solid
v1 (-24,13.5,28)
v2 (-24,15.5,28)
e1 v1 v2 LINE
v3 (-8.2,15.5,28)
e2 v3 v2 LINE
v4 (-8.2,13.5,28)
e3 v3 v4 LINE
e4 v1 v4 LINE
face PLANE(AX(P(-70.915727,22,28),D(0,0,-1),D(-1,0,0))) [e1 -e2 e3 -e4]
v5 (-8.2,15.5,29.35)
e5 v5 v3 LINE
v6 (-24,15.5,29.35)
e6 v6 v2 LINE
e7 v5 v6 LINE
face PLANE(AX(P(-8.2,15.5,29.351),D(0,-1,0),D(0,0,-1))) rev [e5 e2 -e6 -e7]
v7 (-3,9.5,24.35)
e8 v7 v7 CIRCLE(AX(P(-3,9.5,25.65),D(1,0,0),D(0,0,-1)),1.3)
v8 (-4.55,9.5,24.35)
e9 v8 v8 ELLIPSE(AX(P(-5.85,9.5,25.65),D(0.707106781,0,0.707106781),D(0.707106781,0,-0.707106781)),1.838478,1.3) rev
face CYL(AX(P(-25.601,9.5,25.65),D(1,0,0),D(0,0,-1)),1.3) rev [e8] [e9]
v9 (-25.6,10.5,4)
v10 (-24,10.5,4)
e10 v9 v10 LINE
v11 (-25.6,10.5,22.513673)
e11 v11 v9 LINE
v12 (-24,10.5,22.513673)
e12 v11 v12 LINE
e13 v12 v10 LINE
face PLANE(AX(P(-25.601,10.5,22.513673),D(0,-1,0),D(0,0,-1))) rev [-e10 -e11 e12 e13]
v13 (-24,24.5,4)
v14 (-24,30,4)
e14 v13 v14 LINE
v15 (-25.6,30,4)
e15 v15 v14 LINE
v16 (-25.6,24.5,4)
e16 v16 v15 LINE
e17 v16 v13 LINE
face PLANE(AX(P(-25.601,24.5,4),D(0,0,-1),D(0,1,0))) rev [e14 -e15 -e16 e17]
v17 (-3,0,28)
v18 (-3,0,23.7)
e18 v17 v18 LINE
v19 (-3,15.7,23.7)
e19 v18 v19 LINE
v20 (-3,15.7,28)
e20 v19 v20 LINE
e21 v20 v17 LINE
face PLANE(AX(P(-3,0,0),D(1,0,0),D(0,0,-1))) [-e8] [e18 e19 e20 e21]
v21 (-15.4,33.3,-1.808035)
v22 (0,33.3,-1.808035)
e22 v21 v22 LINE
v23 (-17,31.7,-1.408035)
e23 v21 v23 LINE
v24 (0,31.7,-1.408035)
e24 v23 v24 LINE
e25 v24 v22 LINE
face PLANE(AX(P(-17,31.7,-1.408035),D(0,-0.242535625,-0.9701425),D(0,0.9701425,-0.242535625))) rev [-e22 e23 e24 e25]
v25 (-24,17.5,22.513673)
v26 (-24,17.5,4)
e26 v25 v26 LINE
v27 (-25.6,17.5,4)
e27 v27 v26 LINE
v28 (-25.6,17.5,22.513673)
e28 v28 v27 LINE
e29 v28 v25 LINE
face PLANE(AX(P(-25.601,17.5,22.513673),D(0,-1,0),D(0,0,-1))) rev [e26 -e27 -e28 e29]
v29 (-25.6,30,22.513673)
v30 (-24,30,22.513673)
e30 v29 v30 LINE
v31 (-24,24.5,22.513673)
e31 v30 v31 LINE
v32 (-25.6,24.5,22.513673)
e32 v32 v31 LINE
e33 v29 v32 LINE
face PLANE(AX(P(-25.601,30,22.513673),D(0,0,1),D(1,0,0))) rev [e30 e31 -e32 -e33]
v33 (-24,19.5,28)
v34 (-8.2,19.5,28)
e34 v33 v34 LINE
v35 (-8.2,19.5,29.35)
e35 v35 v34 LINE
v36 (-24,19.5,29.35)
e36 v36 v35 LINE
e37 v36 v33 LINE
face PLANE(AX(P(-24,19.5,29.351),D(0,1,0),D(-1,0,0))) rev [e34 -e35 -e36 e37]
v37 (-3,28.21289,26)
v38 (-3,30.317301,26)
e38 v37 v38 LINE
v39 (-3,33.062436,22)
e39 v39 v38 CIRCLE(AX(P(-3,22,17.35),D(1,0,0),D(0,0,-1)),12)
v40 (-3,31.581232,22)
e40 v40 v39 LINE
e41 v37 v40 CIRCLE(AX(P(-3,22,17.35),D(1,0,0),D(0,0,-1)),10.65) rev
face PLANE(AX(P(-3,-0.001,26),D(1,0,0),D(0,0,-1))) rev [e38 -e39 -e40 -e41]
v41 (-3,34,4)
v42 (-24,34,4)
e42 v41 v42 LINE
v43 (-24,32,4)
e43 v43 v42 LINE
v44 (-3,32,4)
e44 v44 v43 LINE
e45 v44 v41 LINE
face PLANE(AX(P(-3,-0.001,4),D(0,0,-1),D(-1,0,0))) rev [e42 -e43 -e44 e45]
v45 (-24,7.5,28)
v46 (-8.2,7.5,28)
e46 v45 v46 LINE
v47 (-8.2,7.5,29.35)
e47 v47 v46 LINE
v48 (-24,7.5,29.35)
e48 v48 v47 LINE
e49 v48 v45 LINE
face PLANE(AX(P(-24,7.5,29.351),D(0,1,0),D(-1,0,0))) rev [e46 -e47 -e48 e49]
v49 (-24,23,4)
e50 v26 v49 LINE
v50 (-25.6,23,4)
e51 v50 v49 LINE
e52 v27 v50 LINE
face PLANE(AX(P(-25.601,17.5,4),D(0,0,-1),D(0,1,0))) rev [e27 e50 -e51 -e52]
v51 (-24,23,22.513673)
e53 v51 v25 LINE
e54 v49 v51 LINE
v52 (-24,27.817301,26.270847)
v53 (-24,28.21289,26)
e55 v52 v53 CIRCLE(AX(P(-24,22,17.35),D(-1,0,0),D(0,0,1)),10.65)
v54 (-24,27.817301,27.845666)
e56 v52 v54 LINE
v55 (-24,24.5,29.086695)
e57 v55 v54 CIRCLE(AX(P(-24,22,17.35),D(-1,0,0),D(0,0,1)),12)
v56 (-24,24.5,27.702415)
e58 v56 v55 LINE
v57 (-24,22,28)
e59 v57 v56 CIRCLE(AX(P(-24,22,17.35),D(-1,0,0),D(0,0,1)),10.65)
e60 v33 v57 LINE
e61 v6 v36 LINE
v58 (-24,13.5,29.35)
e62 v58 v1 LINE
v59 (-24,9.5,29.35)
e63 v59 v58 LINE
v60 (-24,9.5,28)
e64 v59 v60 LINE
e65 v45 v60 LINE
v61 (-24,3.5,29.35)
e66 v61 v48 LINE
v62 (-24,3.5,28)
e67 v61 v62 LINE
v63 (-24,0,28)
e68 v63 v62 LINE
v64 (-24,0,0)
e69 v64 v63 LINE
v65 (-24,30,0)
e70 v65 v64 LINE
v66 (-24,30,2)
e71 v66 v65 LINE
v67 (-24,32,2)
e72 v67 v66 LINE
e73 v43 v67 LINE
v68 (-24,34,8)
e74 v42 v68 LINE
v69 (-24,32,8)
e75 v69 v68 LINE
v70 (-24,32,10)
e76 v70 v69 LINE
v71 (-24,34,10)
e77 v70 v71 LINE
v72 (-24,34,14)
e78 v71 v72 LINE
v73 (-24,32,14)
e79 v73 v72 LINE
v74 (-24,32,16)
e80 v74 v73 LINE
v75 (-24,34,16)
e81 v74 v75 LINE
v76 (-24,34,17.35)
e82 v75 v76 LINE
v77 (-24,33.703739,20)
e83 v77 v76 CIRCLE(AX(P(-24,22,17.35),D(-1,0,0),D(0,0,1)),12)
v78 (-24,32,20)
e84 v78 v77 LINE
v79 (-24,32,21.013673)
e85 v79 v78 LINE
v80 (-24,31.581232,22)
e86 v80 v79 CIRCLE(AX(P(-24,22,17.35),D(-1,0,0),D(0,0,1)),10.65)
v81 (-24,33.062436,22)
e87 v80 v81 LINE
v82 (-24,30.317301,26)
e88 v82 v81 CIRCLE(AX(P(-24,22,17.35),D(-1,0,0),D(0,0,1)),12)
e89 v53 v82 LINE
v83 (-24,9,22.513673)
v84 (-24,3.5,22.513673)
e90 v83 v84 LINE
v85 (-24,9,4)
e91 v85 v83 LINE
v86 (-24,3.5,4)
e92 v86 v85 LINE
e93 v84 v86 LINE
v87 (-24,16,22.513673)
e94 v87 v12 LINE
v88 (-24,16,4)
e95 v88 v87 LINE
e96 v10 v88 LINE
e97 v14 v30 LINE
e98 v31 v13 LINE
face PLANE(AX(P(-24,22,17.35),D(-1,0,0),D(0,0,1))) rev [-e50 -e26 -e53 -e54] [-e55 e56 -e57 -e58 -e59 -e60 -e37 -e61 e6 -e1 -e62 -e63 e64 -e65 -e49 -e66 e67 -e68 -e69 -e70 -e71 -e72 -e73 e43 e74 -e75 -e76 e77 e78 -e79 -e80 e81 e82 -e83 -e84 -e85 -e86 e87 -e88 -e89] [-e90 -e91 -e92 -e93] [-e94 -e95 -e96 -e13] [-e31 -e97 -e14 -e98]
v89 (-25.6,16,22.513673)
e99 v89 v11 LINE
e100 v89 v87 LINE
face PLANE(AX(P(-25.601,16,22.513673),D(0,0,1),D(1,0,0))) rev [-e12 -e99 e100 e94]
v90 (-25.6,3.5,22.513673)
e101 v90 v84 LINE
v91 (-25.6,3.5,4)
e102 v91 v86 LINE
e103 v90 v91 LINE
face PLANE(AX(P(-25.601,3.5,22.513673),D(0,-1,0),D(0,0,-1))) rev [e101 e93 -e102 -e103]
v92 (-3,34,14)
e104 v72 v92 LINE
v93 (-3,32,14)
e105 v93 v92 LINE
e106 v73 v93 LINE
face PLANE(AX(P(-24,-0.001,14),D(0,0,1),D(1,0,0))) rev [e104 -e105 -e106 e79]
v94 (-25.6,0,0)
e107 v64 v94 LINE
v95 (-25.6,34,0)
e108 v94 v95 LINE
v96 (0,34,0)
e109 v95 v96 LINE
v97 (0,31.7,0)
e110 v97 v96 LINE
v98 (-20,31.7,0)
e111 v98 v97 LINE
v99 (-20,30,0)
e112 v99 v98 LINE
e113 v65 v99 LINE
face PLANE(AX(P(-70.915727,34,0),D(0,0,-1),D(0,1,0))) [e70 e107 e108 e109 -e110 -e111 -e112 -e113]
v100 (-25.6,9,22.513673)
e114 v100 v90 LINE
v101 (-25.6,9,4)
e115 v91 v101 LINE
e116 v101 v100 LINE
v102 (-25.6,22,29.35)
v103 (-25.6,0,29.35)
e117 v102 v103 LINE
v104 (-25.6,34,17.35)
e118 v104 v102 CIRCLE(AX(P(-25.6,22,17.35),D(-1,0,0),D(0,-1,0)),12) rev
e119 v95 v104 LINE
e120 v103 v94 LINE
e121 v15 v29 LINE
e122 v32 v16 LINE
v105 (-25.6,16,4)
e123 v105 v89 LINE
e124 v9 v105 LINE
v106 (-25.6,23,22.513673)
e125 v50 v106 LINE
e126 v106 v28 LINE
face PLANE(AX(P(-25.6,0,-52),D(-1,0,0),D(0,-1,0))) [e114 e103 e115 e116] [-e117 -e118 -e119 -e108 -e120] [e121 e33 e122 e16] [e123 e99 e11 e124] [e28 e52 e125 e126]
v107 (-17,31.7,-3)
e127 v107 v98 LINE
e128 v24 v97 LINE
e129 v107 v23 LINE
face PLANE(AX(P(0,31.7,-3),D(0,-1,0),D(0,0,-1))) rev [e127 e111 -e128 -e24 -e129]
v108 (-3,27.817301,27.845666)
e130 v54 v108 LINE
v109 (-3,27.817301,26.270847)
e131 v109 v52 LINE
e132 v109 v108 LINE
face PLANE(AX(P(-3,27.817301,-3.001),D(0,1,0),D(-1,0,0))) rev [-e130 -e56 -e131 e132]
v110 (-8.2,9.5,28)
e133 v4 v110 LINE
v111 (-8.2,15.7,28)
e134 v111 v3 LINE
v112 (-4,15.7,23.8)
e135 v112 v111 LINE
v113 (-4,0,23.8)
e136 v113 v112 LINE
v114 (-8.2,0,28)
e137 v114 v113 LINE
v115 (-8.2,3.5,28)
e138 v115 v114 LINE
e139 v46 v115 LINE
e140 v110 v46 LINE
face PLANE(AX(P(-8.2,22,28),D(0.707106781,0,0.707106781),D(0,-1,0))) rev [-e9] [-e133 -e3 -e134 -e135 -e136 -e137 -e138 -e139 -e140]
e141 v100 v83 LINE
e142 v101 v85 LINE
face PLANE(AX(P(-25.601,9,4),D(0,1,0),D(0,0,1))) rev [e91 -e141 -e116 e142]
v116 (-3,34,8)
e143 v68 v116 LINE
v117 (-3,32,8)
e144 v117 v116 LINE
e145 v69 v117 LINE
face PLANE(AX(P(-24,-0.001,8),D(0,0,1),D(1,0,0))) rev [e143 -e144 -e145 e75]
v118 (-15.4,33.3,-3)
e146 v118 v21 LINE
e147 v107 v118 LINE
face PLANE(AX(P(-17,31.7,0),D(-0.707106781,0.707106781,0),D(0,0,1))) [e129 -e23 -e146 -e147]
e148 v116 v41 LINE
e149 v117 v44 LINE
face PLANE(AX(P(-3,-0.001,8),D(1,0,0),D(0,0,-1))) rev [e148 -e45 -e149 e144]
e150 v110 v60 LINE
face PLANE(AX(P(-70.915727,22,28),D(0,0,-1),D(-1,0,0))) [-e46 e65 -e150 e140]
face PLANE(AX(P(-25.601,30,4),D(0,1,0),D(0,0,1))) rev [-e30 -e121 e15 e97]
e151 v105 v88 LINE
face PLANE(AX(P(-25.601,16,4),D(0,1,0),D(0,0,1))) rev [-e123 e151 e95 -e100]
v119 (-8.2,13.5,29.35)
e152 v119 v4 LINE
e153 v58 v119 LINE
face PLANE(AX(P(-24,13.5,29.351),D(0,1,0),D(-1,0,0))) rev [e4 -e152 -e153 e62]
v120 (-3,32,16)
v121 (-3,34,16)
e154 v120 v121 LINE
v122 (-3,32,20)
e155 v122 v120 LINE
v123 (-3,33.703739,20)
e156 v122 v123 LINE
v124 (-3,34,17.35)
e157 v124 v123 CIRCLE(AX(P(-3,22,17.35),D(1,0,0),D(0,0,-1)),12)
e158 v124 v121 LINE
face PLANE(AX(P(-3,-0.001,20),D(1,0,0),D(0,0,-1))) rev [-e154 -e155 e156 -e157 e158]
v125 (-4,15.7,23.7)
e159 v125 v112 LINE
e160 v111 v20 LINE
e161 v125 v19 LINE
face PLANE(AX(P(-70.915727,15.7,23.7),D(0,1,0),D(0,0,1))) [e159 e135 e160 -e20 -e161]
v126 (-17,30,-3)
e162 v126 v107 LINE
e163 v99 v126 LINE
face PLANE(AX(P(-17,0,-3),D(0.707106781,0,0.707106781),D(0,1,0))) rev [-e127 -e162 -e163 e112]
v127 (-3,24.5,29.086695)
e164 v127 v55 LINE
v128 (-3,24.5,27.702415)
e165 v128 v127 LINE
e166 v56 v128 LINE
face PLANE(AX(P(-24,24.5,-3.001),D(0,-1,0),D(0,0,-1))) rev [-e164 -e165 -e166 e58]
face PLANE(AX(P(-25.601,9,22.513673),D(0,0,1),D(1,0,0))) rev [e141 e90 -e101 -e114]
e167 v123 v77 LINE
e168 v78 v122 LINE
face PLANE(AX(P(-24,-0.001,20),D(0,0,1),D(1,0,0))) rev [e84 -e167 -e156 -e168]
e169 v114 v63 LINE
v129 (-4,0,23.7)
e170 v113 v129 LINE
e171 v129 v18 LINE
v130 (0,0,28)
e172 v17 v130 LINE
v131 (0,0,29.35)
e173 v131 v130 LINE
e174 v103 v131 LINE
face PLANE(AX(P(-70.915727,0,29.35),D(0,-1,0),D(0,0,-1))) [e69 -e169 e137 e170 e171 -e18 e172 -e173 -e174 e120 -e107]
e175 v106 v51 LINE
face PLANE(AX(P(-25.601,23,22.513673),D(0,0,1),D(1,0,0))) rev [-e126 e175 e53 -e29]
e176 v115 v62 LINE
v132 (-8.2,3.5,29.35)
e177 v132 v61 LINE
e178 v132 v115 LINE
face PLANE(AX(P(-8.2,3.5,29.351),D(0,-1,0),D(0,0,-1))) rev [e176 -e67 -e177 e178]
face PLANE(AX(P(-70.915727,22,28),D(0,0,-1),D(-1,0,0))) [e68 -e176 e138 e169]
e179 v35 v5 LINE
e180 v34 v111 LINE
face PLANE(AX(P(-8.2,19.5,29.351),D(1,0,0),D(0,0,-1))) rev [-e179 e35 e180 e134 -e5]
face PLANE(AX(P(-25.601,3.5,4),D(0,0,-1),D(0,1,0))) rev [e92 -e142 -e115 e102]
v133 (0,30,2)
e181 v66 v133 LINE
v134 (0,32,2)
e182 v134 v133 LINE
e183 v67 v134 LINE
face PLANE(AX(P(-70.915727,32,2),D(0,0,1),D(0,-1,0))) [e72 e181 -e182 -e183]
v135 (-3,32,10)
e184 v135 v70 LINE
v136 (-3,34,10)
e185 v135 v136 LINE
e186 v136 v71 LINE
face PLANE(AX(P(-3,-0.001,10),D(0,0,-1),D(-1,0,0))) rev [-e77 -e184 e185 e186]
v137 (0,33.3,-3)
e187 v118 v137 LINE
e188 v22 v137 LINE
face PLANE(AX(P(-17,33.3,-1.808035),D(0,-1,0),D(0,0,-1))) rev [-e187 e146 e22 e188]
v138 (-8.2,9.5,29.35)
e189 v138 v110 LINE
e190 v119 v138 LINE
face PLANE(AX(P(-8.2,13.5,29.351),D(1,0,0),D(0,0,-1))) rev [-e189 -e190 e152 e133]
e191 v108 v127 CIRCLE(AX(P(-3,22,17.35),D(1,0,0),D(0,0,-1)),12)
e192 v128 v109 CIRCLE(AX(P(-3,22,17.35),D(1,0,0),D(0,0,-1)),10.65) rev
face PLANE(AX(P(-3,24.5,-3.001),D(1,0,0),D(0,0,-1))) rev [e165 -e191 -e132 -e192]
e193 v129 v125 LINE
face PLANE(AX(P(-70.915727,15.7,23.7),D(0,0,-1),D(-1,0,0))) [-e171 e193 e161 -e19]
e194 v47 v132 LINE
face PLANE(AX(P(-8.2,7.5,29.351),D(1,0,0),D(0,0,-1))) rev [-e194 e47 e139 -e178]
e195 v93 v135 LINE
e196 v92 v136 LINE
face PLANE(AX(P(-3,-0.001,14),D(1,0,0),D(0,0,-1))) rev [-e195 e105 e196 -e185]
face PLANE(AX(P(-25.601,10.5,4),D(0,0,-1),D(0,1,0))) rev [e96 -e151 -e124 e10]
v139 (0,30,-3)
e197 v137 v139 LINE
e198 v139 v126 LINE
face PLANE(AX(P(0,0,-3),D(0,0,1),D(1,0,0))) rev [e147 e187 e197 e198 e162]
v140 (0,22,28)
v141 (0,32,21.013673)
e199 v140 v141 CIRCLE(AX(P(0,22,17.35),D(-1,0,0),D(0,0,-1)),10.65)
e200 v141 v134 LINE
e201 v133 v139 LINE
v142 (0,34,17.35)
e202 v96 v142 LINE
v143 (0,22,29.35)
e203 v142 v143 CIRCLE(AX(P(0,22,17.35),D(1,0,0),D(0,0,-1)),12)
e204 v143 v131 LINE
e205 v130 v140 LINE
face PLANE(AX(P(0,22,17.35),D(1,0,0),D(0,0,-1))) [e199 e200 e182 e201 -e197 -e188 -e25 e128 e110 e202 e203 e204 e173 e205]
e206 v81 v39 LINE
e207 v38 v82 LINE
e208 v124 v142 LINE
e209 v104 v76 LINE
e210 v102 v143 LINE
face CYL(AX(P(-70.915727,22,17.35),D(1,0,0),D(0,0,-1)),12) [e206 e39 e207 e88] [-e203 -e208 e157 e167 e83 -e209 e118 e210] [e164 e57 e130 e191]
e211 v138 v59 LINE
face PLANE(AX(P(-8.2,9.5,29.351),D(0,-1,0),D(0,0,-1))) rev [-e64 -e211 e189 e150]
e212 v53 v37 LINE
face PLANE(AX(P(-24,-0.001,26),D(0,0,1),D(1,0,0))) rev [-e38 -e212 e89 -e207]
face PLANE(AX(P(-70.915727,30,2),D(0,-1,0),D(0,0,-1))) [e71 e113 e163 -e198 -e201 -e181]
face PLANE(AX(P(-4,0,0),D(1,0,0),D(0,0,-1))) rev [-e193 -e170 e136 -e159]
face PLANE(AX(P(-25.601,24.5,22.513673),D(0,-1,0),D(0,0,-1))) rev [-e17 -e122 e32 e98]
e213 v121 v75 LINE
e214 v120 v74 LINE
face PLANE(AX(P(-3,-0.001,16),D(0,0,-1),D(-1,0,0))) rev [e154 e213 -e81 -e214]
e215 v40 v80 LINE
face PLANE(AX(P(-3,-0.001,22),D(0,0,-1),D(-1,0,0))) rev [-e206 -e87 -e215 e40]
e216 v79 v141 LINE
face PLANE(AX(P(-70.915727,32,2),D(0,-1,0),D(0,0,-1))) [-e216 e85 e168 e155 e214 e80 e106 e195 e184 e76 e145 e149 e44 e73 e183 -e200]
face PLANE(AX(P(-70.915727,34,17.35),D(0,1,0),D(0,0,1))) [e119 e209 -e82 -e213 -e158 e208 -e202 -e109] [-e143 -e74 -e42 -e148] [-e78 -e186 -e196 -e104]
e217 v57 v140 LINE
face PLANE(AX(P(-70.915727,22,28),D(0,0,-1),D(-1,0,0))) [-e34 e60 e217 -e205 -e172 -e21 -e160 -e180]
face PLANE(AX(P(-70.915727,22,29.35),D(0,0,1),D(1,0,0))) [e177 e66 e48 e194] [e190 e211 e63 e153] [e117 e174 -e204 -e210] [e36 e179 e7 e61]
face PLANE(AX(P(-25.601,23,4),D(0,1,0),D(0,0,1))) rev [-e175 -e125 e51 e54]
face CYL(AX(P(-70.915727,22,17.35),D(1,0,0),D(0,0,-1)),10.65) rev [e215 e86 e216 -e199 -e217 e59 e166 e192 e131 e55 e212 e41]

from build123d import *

# Parameters (mm, degrees)
BOSS_EXTRUDE1_DEPTH     = 25.6
SKETCH2_W               = 4.3
SKETCH2_H               = 15.7
CUT_EXTRUDE1_DEPTH      = 3
CUT_EXTRUDE2_REACH      = 52.281
SKETCH3_R               = 1.3
BOSS_EXTRUDE2_START     = -1.6
BOSS_EXTRUDE2_DEPTH     = 1.6
SKETCH6_W               = 20
SKETCH6_H               = 1.7
BOSS_EXTRUDE3_DEPTH     = 3
CHAMFER2_SIZE           = 3
BOSS_EXTRUDE5_DEPTH     = 17
CHAMFER3_SIZE           = 1.6
CUT_EXTRUDE3_REACH      = 52.926
SKETCH9_W               = 18.51367302
SKETCH9_H               = 5.5
LPATTERN1_COUNT         = 4
LPATTERN1_PITCH         = 7
CUT_EXTRUDE4_REACH      = 53.699
SKETCH10_W              = 21
SKETCH10_H              = 4
LPATTERN2_COUNT         = 4
LPATTERN2_PITCH         = 6
SKETCH11_W              = 4.3
SKETCH11_H              = 15.7
CUT_EXTRUDE5_DEPTH      = 20
CHAMFER4_SIZE           = 4.2
CUT_EXTRUDE6_REACH      = 54.653
SKETCH12_W              = 15.8
SKETCH12_H              = 4
LPATTERN3_COUNT         = 3
LPATTERN3_PITCH         = 6
CUT_EXTRUDE7_REACH      = 55.459
CUT_EXTRUDE7_END_RADIUS = 10.65
SKETCH13_W              = 21
SKETCH13_H              = 3.317301245


# Some blends are built 0.0001 mm under size
with BuildPart() as part:
    # Sketch1 → Boss-Extrude1 (new body)
    with BuildSketch(Plane(origin=(0, 0, 0), x_dir=(0, 0, -1), z_dir=(1, 0, 0))):
        with BuildLine():
            Line((-2, 32), (-2, 30))
            Line((-2, 30), (0, 30))
            Line((0, 30), (0, 34))
            Line((0, 34), (-17.35, 34))
            ThreePointArc((-17.35, 34), (-25.835281374, 30.485281374), (-29.35, 22))
            Line((-29.35, 22), (-29.35, 0))
            Line((-29.35, 0), (-23.7, 0))
            Line((-23.7, 0), (-23.7, 15.7))
            Line((-23.7, 15.7), (-28, 15.7))
            Line((-28, 15.7), (-28, 22))
            ThreePointArc((-28, 22), (-26.080424321, 28.099359898), (-21.01367302, 32))
            Line((-21.01367302, 32), (-2, 32))
        make_face()
    extrude(amount=-BOSS_EXTRUDE1_DEPTH)

    # Sketch2 → Cut-Extrude1 (cut)
    with BuildSketch(Plane(origin=(0, 0, 0), x_dir=(0, 0, -1), z_dir=(1, 0, 0))):
        with Locations((-25.85, 7.85)):
            Rectangle(SKETCH2_W, SKETCH2_H)
    extrude(amount=-CUT_EXTRUDE1_DEPTH, mode=Mode.SUBTRACT)

    # Sketch3 → Cut-Extrude2 (cut, up to next)
    with BuildSketch(Plane(origin=(-3, 0, 0), x_dir=(0, 0, -1), z_dir=(1, 0, 0)), mode=Mode.PRIVATE) as cut_extrude2_sk1:
        with Locations((-25.65, 9.5)):
            Circle(SKETCH3_R)
    cut_extrude2_tool1 = extrude(cut_extrude2_sk1.sketch, amount=-CUT_EXTRUDE2_REACH, mode=Mode.PRIVATE) & part.part
    add(cut_extrude2_tool1.solids().sort_by_distance((-3, 9.5, 25.65))[0], mode=Mode.SUBTRACT)

    # Sketch4 → Boss-Extrude2 (add)
    with BuildSketch(Plane.ZY.offset(25.6).offset(BOSS_EXTRUDE2_START)):
        with BuildLine():
            Line((0, 34), (0, 0))
            Line((0, 0), (29.35, 0))
            Line((29.35, 0), (29.35, 22))
            ThreePointArc((29.35, 22), (25.835281374, 30.485281374), (17.35, 34))
            Line((17.35, 34), (0, 34))
        make_face()
    extrude(amount=BOSS_EXTRUDE2_DEPTH)

    # Sketch6 → Boss-Extrude3 (add)
    with BuildSketch(Plane(origin=(0, 0, 0), x_dir=(-1, 0, 0), z_dir=(0, 0, -1))):
        with Locations((10, 30.85)):
            Rectangle(SKETCH6_W, SKETCH6_H)
    extrude(amount=BOSS_EXTRUDE3_DEPTH)

    # Chamfer2
    chamfer2_edges = [part.edges().sort_by_distance(p)[0] for p in [
        (-20, 30.85, -3),
    ]]
    chamfer(chamfer2_edges, length=CHAMFER2_SIZE - 0.0001)  # a hair under: the kernel refuses the full size

    # Sketch8 → Boss-Extrude5 (add)
    with BuildSketch(Plane.ZY):
        Polygon((-1.408034607, 31.7), (-1.808034607, 33.3), (-3, 33.3), (-3, 31.7), align=None)
    extrude(amount=BOSS_EXTRUDE5_DEPTH)

    # Chamfer3
    chamfer3_edges = [part.edges().sort_by_distance(p)[0] for p in [
        (-17, 33.3, -2.404017304),
    ]]
    chamfer(chamfer3_edges, length=CHAMFER3_SIZE - 0.0001)  # a hair under: the kernel refuses the full size

    # Sketch9 → Cut-Extrude3 (cut, up to next)
    with BuildSketch(Plane(origin=(-24, 0, 0), x_dir=(0, 0, -1), z_dir=(1, 0, 0)), mode=Mode.PRIVATE) as cut_extrude3_sk1:
        with Locations((-13.25683651, 27.25)):
            Rectangle(SKETCH9_W, SKETCH9_H)
    cut_extrude3_tool1 = extrude(cut_extrude3_sk1.sketch, amount=-CUT_EXTRUDE3_REACH, mode=Mode.PRIVATE) & part.part
    cut_extrude3 = cut_extrude3_tool1.solids().sort_by_distance((-24, 27.25, 13.256837))[0]
    add(cut_extrude3, mode=Mode.SUBTRACT)

    # LPattern1: Cut-Extrude3 ×4
    with Locations(*[(0, -i * LPATTERN1_PITCH, 0) for i in range(1, LPATTERN1_COUNT)]):
        add(cut_extrude3, mode=Mode.SUBTRACT)

    # Sketch10 → Cut-Extrude4 (cut, up to next)
    with BuildSketch(Plane(origin=(0, 34, 0), x_dir=(1, 0, 0), z_dir=(0, 1, 0)), mode=Mode.PRIVATE) as cut_extrude4_sk1:
        with Locations((-13.5, -6)):
            Rectangle(SKETCH10_W, SKETCH10_H)
    cut_extrude4_tool1 = extrude(cut_extrude4_sk1.sketch, amount=-CUT_EXTRUDE4_REACH, mode=Mode.PRIVATE) & part.part
    cut_extrude4 = cut_extrude4_tool1.solids().sort_by_distance((-13.5, 34, 6))[0]
    add(cut_extrude4, mode=Mode.SUBTRACT)

    # LPattern2: Cut-Extrude4; each copy of Cut-Extrude4 runs up to whatever stops it at its own place
    lpattern2_before = part.part  # the part as the pattern finds it: every copy runs up to it
    lpattern2_cut_extrude4_long = extrude(cut_extrude4_sk1.sketch, amount=-CUT_EXTRUDE4_REACH, mode=Mode.PRIVATE)
    lpattern2_cut_extrude4_tool1 = lpattern2_cut_extrude4_long.moved(Location(Vector(0, 0, 1) * (1 * LPATTERN2_PITCH))) & lpattern2_before
    add(lpattern2_cut_extrude4_tool1.solids().sort_by_distance((-13.5, 34, 12))[0], mode=Mode.SUBTRACT)
    lpattern2_cut_extrude4_tool2 = lpattern2_cut_extrude4_long.moved(Location(Vector(0, 0, 1) * (2 * LPATTERN2_PITCH))) & lpattern2_before
    add(lpattern2_cut_extrude4_tool2.solids().sort_by_distance((-13.5, 34, 18))[0], mode=Mode.SUBTRACT)
    lpattern2_cut_extrude4_tool3 = lpattern2_cut_extrude4_long.moved(Location(Vector(0, 0, 1) * (3 * LPATTERN2_PITCH))) & lpattern2_before
    add(lpattern2_cut_extrude4_tool3.solids().sort_by_distance((-13.5, 34, 24))[0], mode=Mode.SUBTRACT)

    # Sketch11 → Cut-Extrude5 (cut)
    with BuildSketch(Plane(origin=(-24, 0, 0), x_dir=(0, 0, -1), z_dir=(1, 0, 0))):
        with Locations((-25.85, 7.85)):
            Rectangle(SKETCH11_W, SKETCH11_H)
    extrude(amount=CUT_EXTRUDE5_DEPTH, mode=Mode.SUBTRACT)

    # Chamfer4
    # the kernel refuses this chamfer: 4.2 mm, written as the material it adds along each edge
    with BuildSketch(Plane(origin=(-4, 15.7, 28), x_dir=(-0.9996219169112966, 0, 0.02749587661058612), z_dir=(0, -1, 0))) as chamfer4_piece_1_section:
        Polygon((CHAMFER4_SIZE * 0.999621916911, CHAMFER4_SIZE * 0.0274958766106), (-CHAMFER4_SIZE * 0.0274958766106, CHAMFER4_SIZE * 0.999621916911), (0, 0), align=None)
    chamfer4_piece_1 = extrude(amount=15.7, mode=Mode.PRIVATE)
    chamfer4_piece_1 = chamfer4_piece_1 - Plane(origin=(-5.414149403, 9.5, 25.65), x_dir=(0, 0, -1), z_dir=(1, 0, 0)) * Cylinder(1.3, 49, mode=Mode.PRIVATE)
    add(chamfer4_piece_1)

    # Sketch12 → Cut-Extrude6 (cut, up to next)
    with BuildSketch(Plane(origin=(0, 0, 28), x_dir=(-1, 0, 0), z_dir=(0, 0, -1)), mode=Mode.PRIVATE) as cut_extrude6_sk1:
        with Locations((16.1, 5.5)):
            Rectangle(SKETCH12_W, SKETCH12_H)
    cut_extrude6_tool1 = extrude(cut_extrude6_sk1.sketch, amount=-CUT_EXTRUDE6_REACH, mode=Mode.PRIVATE) & part.part
    cut_extrude6 = cut_extrude6_tool1.solids().sort_by_distance((-16.1, 5.5, 28))[0]
    add(cut_extrude6, mode=Mode.SUBTRACT)

    # LPattern3: Cut-Extrude6 ×3
    with Locations(*[(0, i * LPATTERN3_PITCH, 0) for i in range(1, LPATTERN3_COUNT)]):
        add(cut_extrude6, mode=Mode.SUBTRACT)

    # Cut-Extrude7: up to this cylinder (the profile starts outside it)
    cut_extrude7_end = Plane(origin=(-13.5, 22, 17.35), z_dir=(1, 0, 0)) * Cylinder(CUT_EXTRUDE7_END_RADIUS, 133.218, mode=Mode.PRIVATE)
    # Sketch13 → Cut-Extrude7 (cut, up to the surface)
    with BuildSketch(Plane.XY.offset(29.35), mode=Mode.PRIVATE) as cut_extrude7_sk1:
        with Locations((-13.5, 26.158650623)):
            Rectangle(SKETCH13_W, SKETCH13_H)
    cut_extrude7_tool1 = extrude(cut_extrude7_sk1.sketch, amount=-CUT_EXTRUDE7_REACH, mode=Mode.PRIVATE) - cut_extrude7_end
    add(cut_extrude7_tool1.solids().sort_by_distance((-13.5, 26.158651, 29.35))[0], mode=Mode.SUBTRACT)


solid = part.part
